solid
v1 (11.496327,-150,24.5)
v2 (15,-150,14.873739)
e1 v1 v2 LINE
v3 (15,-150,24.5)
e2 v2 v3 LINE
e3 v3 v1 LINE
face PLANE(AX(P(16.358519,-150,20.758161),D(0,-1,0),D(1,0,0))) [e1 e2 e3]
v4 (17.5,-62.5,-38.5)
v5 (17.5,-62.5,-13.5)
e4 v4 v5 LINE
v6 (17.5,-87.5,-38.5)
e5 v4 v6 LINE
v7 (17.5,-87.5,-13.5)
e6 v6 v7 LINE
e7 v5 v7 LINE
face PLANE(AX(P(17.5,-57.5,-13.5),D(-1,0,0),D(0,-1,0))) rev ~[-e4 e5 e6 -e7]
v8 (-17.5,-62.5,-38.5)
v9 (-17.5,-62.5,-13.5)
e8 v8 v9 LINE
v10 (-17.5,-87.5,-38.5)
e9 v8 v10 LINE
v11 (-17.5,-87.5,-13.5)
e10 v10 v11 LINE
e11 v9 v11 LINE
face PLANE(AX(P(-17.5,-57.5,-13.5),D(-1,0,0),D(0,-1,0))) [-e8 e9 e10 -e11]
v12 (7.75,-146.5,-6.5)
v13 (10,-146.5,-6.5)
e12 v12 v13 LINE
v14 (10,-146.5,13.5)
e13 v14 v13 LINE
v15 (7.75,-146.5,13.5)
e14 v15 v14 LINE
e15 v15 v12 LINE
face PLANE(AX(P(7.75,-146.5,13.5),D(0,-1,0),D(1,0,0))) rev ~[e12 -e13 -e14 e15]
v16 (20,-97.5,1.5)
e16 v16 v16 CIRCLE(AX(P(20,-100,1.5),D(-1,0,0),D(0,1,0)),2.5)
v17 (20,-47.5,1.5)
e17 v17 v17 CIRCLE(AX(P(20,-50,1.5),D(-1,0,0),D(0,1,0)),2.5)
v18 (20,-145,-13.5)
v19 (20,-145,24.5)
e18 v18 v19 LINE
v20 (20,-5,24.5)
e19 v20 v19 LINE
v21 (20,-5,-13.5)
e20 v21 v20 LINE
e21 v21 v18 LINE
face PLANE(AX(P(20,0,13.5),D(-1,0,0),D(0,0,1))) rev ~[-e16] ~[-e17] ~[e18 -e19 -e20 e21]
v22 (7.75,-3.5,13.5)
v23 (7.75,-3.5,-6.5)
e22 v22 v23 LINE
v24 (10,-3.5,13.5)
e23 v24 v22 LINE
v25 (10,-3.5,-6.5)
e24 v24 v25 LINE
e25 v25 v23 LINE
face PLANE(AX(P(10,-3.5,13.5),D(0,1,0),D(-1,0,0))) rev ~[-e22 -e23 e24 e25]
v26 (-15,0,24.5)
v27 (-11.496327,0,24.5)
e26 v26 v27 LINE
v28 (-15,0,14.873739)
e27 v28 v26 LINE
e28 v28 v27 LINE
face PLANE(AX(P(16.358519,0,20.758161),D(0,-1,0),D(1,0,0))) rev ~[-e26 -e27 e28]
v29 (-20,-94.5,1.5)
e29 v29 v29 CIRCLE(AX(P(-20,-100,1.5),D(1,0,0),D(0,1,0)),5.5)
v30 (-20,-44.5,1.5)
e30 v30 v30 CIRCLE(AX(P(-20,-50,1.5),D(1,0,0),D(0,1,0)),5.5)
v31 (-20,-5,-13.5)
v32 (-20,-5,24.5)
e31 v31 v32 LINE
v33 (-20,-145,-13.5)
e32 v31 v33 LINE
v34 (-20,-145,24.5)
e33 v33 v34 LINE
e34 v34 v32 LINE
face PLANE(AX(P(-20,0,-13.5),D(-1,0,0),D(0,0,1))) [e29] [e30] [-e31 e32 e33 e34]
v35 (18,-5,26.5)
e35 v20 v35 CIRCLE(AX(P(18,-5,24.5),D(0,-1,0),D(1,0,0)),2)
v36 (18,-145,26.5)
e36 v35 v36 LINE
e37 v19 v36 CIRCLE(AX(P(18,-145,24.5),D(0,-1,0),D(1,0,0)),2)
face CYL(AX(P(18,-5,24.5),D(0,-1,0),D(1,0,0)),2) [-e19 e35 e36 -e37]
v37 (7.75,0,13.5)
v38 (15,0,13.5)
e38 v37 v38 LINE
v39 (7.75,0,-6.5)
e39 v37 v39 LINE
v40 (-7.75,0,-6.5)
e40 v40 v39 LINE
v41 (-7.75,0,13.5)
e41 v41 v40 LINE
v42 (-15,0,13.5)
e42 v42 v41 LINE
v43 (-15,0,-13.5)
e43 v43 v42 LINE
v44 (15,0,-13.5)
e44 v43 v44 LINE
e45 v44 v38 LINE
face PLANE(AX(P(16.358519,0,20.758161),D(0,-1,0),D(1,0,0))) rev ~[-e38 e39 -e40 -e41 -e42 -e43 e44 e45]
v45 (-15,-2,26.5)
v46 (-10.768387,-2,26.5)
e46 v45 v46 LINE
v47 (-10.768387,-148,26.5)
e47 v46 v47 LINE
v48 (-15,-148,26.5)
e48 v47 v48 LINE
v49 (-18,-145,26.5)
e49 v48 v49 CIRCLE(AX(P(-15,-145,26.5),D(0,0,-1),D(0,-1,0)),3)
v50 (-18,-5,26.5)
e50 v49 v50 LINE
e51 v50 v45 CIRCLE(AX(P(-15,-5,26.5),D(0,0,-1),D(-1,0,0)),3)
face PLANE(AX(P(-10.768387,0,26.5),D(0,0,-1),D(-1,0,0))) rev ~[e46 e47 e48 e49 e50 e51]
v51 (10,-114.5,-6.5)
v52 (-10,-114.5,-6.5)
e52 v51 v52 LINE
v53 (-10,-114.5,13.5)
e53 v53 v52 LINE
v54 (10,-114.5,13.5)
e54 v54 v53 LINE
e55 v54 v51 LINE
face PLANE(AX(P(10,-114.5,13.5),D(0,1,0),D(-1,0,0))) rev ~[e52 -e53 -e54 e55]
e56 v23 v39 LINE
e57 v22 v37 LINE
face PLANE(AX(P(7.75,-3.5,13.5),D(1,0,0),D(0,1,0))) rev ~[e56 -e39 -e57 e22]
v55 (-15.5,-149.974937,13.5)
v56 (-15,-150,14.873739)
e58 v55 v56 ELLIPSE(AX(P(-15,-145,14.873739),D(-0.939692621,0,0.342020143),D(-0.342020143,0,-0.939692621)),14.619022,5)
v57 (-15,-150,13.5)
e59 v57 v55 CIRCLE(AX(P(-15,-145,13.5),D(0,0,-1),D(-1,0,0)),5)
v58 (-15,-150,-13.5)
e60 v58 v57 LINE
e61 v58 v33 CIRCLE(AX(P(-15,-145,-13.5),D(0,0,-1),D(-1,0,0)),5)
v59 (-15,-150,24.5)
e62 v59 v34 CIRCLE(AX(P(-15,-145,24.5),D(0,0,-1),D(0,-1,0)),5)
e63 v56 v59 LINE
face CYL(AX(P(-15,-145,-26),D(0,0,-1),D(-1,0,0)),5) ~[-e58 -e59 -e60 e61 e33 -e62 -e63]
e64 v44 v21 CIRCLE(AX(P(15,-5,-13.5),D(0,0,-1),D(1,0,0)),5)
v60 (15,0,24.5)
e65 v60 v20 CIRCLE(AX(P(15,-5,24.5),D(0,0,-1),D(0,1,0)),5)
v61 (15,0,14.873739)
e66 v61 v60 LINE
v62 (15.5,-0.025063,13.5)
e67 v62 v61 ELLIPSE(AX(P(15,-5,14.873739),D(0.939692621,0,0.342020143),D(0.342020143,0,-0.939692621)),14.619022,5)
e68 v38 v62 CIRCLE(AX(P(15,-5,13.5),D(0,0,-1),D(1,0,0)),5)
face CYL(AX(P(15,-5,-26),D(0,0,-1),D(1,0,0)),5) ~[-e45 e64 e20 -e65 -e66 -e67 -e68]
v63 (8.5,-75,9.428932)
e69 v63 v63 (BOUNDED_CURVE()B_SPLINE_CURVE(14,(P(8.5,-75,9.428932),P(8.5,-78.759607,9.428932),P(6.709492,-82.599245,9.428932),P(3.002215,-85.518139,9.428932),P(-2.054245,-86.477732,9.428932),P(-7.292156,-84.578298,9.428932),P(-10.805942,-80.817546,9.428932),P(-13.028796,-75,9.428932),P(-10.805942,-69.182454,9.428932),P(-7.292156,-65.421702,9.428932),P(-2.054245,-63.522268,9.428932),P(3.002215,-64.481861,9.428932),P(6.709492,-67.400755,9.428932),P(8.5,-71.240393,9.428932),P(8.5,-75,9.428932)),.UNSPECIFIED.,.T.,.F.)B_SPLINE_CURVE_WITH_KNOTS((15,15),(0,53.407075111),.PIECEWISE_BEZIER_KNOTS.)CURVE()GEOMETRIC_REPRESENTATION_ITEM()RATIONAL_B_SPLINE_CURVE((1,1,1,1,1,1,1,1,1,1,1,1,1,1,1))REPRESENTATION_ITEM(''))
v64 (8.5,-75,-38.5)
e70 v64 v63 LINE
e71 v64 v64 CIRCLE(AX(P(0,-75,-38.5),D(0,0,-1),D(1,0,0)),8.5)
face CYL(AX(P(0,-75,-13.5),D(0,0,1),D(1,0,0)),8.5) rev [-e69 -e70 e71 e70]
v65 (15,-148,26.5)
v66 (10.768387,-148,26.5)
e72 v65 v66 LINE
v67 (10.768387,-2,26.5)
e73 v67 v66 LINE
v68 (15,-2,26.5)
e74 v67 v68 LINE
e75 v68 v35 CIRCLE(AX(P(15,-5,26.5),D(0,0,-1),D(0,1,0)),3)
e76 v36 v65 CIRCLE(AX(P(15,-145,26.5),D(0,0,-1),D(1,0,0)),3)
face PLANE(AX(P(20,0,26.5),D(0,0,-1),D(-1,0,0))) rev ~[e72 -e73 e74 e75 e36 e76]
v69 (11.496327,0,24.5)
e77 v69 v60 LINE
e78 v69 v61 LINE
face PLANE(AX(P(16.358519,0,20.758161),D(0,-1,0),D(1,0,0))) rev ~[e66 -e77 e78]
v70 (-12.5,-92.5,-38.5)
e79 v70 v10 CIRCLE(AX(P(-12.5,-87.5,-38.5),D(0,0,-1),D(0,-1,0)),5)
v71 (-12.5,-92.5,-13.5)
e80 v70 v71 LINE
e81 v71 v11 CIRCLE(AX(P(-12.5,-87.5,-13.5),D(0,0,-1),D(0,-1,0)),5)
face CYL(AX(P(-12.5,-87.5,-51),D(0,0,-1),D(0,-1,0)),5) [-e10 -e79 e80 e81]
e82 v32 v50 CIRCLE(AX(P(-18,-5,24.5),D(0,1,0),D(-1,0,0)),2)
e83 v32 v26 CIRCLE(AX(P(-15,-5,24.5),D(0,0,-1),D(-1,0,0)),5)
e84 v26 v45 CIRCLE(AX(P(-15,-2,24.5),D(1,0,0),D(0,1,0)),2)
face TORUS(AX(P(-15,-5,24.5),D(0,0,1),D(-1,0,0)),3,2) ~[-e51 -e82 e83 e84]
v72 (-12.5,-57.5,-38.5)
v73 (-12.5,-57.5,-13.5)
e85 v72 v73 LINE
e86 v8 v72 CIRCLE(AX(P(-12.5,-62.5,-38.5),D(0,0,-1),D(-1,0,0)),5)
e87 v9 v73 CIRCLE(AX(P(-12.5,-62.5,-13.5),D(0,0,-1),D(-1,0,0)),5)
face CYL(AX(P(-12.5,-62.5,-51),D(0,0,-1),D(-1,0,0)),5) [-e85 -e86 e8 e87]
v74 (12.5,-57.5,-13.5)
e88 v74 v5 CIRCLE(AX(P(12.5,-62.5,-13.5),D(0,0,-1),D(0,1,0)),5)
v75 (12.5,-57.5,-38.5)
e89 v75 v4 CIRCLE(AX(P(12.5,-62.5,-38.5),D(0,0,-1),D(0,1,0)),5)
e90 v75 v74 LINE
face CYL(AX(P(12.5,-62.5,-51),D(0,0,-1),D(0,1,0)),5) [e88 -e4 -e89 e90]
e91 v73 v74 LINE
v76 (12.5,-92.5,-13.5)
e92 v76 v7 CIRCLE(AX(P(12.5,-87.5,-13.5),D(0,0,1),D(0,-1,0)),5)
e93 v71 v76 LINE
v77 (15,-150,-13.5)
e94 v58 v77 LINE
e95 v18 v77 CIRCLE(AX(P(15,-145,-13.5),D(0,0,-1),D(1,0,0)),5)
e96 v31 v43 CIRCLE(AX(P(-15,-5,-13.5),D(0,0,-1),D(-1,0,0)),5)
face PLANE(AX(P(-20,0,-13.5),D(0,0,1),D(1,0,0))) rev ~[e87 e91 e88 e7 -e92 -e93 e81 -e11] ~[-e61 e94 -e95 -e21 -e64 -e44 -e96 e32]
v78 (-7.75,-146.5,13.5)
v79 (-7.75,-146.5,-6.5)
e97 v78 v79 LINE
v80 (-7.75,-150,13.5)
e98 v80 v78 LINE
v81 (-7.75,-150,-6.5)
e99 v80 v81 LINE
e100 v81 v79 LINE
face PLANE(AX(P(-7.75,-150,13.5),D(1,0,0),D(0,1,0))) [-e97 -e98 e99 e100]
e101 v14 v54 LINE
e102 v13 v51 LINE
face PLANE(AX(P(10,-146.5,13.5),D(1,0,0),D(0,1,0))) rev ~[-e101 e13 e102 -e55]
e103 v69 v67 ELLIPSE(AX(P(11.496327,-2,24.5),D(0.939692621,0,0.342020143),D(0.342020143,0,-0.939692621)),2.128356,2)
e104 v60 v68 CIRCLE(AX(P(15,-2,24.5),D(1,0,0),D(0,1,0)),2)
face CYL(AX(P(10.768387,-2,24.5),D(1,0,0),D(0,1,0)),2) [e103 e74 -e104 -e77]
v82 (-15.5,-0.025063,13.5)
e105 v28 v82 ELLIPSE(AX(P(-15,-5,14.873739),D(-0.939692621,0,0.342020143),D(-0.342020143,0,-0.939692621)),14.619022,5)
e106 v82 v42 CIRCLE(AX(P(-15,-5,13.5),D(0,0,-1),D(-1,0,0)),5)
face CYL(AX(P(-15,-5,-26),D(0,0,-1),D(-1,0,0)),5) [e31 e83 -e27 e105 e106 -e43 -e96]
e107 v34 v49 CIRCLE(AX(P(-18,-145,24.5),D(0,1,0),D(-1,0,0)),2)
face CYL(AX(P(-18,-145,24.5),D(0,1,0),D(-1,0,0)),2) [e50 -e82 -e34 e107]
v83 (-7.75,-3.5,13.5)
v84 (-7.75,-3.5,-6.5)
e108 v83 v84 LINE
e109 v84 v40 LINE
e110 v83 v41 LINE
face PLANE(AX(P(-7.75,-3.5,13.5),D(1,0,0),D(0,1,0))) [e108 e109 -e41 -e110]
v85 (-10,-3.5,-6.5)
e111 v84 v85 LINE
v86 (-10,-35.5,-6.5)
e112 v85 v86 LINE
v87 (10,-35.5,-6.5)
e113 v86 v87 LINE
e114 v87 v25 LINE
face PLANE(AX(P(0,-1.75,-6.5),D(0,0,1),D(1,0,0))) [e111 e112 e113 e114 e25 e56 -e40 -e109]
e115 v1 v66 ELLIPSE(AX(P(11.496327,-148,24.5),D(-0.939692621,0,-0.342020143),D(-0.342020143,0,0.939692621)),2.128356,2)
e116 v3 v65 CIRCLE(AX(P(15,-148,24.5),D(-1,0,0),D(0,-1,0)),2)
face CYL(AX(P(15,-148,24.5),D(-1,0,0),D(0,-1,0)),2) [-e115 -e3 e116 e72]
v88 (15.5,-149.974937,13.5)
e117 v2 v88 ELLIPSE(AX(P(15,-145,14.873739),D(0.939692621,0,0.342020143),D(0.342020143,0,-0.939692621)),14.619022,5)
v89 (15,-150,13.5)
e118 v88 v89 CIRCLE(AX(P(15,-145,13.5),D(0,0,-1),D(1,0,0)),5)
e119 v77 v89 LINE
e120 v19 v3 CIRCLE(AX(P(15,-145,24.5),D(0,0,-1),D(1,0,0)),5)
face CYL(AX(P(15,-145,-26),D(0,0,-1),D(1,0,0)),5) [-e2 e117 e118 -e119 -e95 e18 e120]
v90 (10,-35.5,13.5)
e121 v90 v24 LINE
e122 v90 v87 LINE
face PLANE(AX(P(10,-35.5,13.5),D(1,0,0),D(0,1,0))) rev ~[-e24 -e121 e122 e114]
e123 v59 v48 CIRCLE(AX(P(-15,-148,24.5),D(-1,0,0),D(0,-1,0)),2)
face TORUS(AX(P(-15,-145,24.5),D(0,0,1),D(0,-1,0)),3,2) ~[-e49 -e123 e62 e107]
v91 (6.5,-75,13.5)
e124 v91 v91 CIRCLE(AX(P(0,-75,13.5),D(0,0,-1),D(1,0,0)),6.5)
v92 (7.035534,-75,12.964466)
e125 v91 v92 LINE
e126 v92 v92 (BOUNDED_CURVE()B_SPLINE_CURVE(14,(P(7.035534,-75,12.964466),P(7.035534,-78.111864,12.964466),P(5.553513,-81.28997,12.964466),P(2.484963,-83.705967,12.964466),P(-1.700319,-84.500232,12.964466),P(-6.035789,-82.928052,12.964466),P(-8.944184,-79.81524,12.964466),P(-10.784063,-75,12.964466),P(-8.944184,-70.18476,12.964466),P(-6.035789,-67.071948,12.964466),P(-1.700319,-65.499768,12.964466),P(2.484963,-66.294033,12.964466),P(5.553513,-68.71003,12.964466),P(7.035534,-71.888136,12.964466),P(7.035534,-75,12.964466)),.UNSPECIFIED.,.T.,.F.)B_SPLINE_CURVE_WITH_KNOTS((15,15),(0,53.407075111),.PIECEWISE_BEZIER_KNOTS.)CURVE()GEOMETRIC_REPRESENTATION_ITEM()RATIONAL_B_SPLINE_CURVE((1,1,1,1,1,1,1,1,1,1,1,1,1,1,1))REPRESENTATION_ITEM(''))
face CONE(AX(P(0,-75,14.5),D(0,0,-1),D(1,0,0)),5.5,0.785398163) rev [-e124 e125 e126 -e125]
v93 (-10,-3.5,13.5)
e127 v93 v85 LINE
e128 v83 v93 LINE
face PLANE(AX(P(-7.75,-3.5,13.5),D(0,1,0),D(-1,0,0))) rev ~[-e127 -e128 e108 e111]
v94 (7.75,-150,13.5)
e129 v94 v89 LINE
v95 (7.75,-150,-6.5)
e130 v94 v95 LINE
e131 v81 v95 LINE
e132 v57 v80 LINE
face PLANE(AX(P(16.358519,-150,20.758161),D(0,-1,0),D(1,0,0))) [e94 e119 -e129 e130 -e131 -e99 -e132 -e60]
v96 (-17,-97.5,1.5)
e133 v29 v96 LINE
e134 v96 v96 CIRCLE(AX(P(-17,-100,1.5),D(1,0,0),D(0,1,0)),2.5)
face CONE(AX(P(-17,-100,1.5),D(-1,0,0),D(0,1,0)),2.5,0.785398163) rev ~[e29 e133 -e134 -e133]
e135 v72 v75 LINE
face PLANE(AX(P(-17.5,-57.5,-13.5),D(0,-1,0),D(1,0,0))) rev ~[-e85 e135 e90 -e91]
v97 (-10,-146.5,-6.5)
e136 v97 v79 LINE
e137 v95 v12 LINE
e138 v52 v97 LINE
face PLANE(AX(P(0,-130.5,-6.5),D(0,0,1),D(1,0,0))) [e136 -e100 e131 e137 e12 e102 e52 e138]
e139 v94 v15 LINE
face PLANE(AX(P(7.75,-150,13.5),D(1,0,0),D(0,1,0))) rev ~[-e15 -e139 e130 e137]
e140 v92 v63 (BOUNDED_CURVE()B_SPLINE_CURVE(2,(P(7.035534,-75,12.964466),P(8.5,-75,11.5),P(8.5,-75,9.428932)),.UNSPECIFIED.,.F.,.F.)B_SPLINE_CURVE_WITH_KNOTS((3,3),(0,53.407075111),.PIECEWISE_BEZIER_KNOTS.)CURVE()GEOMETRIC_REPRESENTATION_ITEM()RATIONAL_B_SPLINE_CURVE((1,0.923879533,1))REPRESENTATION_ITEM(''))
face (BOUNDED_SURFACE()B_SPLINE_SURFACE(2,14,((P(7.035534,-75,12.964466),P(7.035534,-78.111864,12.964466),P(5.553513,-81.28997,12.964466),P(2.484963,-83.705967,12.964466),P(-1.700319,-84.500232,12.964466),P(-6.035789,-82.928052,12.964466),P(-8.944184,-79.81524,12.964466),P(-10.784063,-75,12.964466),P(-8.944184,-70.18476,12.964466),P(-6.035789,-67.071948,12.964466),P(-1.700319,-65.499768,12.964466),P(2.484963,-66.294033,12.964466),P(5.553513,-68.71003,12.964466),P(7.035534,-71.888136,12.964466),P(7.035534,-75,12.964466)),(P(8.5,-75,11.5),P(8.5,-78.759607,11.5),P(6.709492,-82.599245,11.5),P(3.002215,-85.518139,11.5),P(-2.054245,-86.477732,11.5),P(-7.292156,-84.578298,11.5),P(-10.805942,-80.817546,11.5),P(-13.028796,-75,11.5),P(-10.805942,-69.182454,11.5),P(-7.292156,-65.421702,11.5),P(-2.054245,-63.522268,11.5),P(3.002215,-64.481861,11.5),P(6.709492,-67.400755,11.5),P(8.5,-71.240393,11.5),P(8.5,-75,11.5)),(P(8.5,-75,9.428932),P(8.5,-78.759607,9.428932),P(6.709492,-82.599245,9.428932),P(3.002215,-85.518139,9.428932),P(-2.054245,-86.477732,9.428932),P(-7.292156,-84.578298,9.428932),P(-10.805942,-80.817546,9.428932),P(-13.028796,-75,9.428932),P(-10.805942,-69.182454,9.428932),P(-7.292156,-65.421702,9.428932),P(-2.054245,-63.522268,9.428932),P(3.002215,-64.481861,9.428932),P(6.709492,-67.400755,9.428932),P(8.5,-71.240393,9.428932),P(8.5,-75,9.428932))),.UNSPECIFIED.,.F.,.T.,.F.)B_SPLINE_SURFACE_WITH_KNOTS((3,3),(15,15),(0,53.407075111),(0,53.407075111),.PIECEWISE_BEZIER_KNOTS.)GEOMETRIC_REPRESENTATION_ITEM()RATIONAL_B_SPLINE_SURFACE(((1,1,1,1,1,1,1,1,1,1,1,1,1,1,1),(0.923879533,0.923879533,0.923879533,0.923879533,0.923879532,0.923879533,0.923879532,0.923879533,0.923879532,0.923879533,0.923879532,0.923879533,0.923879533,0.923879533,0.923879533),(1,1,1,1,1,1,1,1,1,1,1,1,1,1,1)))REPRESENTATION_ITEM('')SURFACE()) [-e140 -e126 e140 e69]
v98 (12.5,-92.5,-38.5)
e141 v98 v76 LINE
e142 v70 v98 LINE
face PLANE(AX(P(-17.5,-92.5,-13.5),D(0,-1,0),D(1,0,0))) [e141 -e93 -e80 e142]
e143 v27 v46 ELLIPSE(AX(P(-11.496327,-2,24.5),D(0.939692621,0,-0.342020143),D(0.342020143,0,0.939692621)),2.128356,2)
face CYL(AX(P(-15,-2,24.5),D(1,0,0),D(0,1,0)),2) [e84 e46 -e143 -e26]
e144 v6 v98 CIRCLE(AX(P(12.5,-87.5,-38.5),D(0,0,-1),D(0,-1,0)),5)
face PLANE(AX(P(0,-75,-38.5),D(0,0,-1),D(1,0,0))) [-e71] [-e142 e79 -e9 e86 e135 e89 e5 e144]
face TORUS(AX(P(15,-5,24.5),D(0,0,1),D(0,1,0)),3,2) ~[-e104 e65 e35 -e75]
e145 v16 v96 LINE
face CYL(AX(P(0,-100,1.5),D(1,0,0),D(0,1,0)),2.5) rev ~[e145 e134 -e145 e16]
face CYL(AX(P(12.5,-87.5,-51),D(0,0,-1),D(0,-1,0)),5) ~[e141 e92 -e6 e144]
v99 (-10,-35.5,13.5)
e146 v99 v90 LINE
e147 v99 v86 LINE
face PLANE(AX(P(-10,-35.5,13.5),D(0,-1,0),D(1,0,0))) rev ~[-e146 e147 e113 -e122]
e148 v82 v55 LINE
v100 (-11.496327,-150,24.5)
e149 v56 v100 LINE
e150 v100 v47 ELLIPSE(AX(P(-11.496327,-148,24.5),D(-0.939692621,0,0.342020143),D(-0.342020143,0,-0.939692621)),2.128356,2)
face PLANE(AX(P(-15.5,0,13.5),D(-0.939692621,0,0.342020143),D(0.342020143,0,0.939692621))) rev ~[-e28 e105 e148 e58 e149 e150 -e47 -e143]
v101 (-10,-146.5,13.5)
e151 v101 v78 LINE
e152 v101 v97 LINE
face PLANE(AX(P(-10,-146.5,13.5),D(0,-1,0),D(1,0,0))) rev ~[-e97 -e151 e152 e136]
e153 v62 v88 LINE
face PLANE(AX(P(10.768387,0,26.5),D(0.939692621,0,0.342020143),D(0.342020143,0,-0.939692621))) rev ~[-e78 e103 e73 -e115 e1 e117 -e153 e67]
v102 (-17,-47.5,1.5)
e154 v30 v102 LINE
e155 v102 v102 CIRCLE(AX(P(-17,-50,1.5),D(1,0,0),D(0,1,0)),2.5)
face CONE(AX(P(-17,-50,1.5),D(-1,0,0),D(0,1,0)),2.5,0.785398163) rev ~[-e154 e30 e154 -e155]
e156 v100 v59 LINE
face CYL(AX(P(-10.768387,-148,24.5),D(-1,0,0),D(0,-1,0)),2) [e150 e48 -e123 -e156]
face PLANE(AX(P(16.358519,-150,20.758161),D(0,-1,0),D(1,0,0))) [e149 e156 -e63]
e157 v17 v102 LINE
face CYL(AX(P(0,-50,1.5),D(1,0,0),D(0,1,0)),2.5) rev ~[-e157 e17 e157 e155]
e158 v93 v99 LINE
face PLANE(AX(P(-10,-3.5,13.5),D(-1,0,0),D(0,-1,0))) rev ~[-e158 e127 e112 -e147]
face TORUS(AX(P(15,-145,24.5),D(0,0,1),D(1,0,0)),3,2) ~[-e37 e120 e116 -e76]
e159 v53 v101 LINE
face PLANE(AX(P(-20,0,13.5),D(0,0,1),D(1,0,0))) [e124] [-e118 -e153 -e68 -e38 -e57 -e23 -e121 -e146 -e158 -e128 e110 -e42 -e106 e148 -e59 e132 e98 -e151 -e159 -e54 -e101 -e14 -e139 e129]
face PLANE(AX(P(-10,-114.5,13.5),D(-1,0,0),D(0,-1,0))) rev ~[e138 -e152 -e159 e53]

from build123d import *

# Parameters (mm, degrees)
F0_W           = 40
F0_H           = 27
F1_DEPTH       = 150
F2_W           = 15.5
F2_H           = 3.5
F3_DEPTH       = 20
F5_W           = 35
F5_H           = 35
F5_R           = 8.5
F6_DEPTH       = 25
F4_R           = 8.5
F7_DEPTH       = 25
F8_R           = 5.5
F9_DEPTH       = 52.001
F10_S5_R       = 8.5
F10_T6_DEPTH   = 14
F11_R          = 5
F13_DEPTH      = 150
F14_T1_DEPTH   = 65
F14_T3_DEPTH   = 37.5
F15_R          = 2
F16_R          = 2.5
F17_DEPTH      = 20.001
F17_DEPTH_BACK = 25
F18_SIZE       = 3


# Not quite as in the source:
# - a fillet or chamfer that OpenCascade refuses, or shapes differently, is made with other operations: its cross-section is extruded or revolved along the edge and cut away or added


with BuildPart() as f1:
    # F0 (on Front) → F1 (new body)
    with BuildSketch(Plane.XZ):
        Rectangle(F0_W, F0_H)
    extrude(amount=F1_DEPTH)

    # F2 (on face) → F3 (cut)
    with BuildSketch(Plane.XY.offset(13.5)):
        with Locations((0, -1.75)):
            Rectangle(F2_W, F2_H)
        Polygon((-7.75, -3.5), (-10, -3.5), (-10, -35.5), (10, -35.5), (10, -3.5), (7.75, -3.5), align=None)
        Polygon((-10, -146.5), (-7.75, -146.5), (7.75, -146.5), (10, -146.5), (10, -114.5), (-10, -114.5), align=None)
        with Locations((0, -148.25)):
            Rectangle(F2_W, F2_H)
    extrude(amount=-F3_DEPTH, mode=Mode.SUBTRACT)

    # F5 (on face) → F6 (join)
    with BuildSketch(Plane(origin=(0, 0, -13.5), x_dir=(1, 0, 0), z_dir=(0, 0, -1))):
        with Locations((0, 75)):
            Rectangle(F5_W, F5_H)
        with Locations((0, 75)):
            Circle(F5_R, mode=Mode.SUBTRACT)
    extrude(amount=F6_DEPTH)

    # F4 (on face) → F7 (cut)
    with BuildSketch(Plane(origin=(0, 0, -13.5), x_dir=(1, 0, 0), z_dir=(0, 0, -1))):
        with Locations((0, 75)):
            Circle(F4_R)
    extrude(amount=-F7_DEPTH, mode=Mode.SUBTRACT)

    # F8 (on face) → F9 (cut, through all)
    with BuildSketch(Plane.XY.offset(13.5)):
        with Locations((0, -75)):
            Circle(F8_R)
    extrude(amount=-F9_DEPTH, mode=Mode.SUBTRACT)

    # F10: chamfer of 3 on 1 edges, made by hand


with BuildPart() as f10_tool2:
    # F10_s3 → F10_t4 (revolve)
    with BuildSketch(Plane.XZ.offset(75)):
        Polygon((5.5, 14.5), (8.5, 11.5), (5.5, 11.5), align=None)
    revolve(axis=Axis((0, -75, 11.5), (0, 0, 1)))

    # F10_s5 → F10_t6 (intersect, symmetric)
    with BuildSketch(Plane.XY.offset(13)):
        with Locations((0, -75)):
            Circle(F10_S5_R)
    extrude(amount=F10_T6_DEPTH, both=True, mode=Mode.INTERSECT)


with BuildPart() as f1_1:
    add(f1.part)

    # F10_t1: cut F10_tool2
    add(f10_tool2.part, mode=Mode.SUBTRACT)

    # F11
    f11_edges = [f1_1.edges().sort_by_distance(p)[0] for p in [
        (-8.5, -75, 11.5),
    ]]
    fillet(f11_edges, radius=F11_R)

    # F12 (on Front) → F13 (join, through all)
    with BuildSketch(Plane.XZ):
        Polygon((10.7683869545, 26.5), (15.5, 13.5), (20, 13.5), (20, 26.5), align=None)
        Polygon((-20, 26.5), (-20, 13.5), (-15.5, 13.5), (-10.7683869545, 26.5), align=None)
    extrude(amount=F13_DEPTH)

    # F14: fillet of radius 5 on 8 edges, made by hand

    # F14_s2 → F14_t1 (cut)
    with BuildSketch(Plane.XY.offset(-26)):
        with BuildLine():
            ThreePointArc((-20, -145), (-18.5355339059, -148.5355339059), (-15, -150))
            Line((-15, -150), (-20, -150))
            Line((-20, -150), (-20, -145))
        make_face()
        with BuildLine():
            ThreePointArc((20, -145), (18.5355339059, -148.5355339059), (15, -150))
            Line((15, -150), (20, -150))
            Line((20, -150), (20, -145))
        make_face()
        with BuildLine():
            ThreePointArc((20, -5), (18.5355339059, -1.4644660941), (15, 0))
            Line((15, 0), (20, 0))
            Line((20, 0), (20, -5))
        make_face()
        with BuildLine():
            ThreePointArc((-20, -5), (-18.5355339059, -1.4644660941), (-15, 0))
            Line((-15, 0), (-20, 0))
            Line((-20, 0), (-20, -5))
        make_face()
    extrude(amount=F14_T1_DEPTH, mode=Mode.SUBTRACT)

    # F14_s4 → F14_t3 (cut)
    with BuildSketch(Plane.XY.offset(-51)):
        with BuildLine():
            ThreePointArc((12.5, -57.5), (16.0355339059, -58.9644660941), (17.5, -62.5))
            Line((17.5, -62.5), (17.5, -57.5))
            Line((17.5, -57.5), (12.5, -57.5))
        make_face()
        with BuildLine():
            ThreePointArc((12.5, -92.5), (16.0355339059, -91.0355339059), (17.5, -87.5))
            Line((17.5, -87.5), (17.5, -92.5))
            Line((17.5, -92.5), (12.5, -92.5))
        make_face()
        with BuildLine():
            ThreePointArc((-17.5, -62.5), (-16.0355339059, -58.9644660941), (-12.5, -57.5))
            Line((-12.5, -57.5), (-17.5, -57.5))
            Line((-17.5, -57.5), (-17.5, -62.5))
        make_face()
        with BuildLine():
            ThreePointArc((-12.5, -92.5), (-16.0355339059, -91.0355339059), (-17.5, -87.5))
            Line((-17.5, -87.5), (-17.5, -92.5))
            Line((-17.5, -92.5), (-12.5, -92.5))
        make_face()
    extrude(amount=F14_T3_DEPTH, mode=Mode.SUBTRACT)

    # F15
    f15_edges = [f1_1.edges().sort_by_distance(p)[0] for p in [
        (-12.884193, -150, 26.5),
        (12.884193, -150, 26.5),
    ]]
    fillet(f15_edges, radius=F15_R)

    # F16 (on Right) → F17 (cut, two sides)
    with BuildSketch(Plane.YZ) as f17_sk:
        with Locations((-100, 1.5)):
            Circle(F16_R)
        with Locations((-50, 1.5)):
            Circle(F16_R)
    extrude(amount=-F17_DEPTH, mode=Mode.SUBTRACT)
    extrude(f17_sk.sketch, amount=F17_DEPTH_BACK, mode=Mode.SUBTRACT)

    # F18
    f18_edges = [f1_1.edges().sort_by_distance(p)[0] for p in [
        (-20, -52.5, 1.5),
        (-20, -102.5, 1.5),
    ]]
    chamfer(f18_edges, length=F18_SIZE)


solid = f1_1.part
